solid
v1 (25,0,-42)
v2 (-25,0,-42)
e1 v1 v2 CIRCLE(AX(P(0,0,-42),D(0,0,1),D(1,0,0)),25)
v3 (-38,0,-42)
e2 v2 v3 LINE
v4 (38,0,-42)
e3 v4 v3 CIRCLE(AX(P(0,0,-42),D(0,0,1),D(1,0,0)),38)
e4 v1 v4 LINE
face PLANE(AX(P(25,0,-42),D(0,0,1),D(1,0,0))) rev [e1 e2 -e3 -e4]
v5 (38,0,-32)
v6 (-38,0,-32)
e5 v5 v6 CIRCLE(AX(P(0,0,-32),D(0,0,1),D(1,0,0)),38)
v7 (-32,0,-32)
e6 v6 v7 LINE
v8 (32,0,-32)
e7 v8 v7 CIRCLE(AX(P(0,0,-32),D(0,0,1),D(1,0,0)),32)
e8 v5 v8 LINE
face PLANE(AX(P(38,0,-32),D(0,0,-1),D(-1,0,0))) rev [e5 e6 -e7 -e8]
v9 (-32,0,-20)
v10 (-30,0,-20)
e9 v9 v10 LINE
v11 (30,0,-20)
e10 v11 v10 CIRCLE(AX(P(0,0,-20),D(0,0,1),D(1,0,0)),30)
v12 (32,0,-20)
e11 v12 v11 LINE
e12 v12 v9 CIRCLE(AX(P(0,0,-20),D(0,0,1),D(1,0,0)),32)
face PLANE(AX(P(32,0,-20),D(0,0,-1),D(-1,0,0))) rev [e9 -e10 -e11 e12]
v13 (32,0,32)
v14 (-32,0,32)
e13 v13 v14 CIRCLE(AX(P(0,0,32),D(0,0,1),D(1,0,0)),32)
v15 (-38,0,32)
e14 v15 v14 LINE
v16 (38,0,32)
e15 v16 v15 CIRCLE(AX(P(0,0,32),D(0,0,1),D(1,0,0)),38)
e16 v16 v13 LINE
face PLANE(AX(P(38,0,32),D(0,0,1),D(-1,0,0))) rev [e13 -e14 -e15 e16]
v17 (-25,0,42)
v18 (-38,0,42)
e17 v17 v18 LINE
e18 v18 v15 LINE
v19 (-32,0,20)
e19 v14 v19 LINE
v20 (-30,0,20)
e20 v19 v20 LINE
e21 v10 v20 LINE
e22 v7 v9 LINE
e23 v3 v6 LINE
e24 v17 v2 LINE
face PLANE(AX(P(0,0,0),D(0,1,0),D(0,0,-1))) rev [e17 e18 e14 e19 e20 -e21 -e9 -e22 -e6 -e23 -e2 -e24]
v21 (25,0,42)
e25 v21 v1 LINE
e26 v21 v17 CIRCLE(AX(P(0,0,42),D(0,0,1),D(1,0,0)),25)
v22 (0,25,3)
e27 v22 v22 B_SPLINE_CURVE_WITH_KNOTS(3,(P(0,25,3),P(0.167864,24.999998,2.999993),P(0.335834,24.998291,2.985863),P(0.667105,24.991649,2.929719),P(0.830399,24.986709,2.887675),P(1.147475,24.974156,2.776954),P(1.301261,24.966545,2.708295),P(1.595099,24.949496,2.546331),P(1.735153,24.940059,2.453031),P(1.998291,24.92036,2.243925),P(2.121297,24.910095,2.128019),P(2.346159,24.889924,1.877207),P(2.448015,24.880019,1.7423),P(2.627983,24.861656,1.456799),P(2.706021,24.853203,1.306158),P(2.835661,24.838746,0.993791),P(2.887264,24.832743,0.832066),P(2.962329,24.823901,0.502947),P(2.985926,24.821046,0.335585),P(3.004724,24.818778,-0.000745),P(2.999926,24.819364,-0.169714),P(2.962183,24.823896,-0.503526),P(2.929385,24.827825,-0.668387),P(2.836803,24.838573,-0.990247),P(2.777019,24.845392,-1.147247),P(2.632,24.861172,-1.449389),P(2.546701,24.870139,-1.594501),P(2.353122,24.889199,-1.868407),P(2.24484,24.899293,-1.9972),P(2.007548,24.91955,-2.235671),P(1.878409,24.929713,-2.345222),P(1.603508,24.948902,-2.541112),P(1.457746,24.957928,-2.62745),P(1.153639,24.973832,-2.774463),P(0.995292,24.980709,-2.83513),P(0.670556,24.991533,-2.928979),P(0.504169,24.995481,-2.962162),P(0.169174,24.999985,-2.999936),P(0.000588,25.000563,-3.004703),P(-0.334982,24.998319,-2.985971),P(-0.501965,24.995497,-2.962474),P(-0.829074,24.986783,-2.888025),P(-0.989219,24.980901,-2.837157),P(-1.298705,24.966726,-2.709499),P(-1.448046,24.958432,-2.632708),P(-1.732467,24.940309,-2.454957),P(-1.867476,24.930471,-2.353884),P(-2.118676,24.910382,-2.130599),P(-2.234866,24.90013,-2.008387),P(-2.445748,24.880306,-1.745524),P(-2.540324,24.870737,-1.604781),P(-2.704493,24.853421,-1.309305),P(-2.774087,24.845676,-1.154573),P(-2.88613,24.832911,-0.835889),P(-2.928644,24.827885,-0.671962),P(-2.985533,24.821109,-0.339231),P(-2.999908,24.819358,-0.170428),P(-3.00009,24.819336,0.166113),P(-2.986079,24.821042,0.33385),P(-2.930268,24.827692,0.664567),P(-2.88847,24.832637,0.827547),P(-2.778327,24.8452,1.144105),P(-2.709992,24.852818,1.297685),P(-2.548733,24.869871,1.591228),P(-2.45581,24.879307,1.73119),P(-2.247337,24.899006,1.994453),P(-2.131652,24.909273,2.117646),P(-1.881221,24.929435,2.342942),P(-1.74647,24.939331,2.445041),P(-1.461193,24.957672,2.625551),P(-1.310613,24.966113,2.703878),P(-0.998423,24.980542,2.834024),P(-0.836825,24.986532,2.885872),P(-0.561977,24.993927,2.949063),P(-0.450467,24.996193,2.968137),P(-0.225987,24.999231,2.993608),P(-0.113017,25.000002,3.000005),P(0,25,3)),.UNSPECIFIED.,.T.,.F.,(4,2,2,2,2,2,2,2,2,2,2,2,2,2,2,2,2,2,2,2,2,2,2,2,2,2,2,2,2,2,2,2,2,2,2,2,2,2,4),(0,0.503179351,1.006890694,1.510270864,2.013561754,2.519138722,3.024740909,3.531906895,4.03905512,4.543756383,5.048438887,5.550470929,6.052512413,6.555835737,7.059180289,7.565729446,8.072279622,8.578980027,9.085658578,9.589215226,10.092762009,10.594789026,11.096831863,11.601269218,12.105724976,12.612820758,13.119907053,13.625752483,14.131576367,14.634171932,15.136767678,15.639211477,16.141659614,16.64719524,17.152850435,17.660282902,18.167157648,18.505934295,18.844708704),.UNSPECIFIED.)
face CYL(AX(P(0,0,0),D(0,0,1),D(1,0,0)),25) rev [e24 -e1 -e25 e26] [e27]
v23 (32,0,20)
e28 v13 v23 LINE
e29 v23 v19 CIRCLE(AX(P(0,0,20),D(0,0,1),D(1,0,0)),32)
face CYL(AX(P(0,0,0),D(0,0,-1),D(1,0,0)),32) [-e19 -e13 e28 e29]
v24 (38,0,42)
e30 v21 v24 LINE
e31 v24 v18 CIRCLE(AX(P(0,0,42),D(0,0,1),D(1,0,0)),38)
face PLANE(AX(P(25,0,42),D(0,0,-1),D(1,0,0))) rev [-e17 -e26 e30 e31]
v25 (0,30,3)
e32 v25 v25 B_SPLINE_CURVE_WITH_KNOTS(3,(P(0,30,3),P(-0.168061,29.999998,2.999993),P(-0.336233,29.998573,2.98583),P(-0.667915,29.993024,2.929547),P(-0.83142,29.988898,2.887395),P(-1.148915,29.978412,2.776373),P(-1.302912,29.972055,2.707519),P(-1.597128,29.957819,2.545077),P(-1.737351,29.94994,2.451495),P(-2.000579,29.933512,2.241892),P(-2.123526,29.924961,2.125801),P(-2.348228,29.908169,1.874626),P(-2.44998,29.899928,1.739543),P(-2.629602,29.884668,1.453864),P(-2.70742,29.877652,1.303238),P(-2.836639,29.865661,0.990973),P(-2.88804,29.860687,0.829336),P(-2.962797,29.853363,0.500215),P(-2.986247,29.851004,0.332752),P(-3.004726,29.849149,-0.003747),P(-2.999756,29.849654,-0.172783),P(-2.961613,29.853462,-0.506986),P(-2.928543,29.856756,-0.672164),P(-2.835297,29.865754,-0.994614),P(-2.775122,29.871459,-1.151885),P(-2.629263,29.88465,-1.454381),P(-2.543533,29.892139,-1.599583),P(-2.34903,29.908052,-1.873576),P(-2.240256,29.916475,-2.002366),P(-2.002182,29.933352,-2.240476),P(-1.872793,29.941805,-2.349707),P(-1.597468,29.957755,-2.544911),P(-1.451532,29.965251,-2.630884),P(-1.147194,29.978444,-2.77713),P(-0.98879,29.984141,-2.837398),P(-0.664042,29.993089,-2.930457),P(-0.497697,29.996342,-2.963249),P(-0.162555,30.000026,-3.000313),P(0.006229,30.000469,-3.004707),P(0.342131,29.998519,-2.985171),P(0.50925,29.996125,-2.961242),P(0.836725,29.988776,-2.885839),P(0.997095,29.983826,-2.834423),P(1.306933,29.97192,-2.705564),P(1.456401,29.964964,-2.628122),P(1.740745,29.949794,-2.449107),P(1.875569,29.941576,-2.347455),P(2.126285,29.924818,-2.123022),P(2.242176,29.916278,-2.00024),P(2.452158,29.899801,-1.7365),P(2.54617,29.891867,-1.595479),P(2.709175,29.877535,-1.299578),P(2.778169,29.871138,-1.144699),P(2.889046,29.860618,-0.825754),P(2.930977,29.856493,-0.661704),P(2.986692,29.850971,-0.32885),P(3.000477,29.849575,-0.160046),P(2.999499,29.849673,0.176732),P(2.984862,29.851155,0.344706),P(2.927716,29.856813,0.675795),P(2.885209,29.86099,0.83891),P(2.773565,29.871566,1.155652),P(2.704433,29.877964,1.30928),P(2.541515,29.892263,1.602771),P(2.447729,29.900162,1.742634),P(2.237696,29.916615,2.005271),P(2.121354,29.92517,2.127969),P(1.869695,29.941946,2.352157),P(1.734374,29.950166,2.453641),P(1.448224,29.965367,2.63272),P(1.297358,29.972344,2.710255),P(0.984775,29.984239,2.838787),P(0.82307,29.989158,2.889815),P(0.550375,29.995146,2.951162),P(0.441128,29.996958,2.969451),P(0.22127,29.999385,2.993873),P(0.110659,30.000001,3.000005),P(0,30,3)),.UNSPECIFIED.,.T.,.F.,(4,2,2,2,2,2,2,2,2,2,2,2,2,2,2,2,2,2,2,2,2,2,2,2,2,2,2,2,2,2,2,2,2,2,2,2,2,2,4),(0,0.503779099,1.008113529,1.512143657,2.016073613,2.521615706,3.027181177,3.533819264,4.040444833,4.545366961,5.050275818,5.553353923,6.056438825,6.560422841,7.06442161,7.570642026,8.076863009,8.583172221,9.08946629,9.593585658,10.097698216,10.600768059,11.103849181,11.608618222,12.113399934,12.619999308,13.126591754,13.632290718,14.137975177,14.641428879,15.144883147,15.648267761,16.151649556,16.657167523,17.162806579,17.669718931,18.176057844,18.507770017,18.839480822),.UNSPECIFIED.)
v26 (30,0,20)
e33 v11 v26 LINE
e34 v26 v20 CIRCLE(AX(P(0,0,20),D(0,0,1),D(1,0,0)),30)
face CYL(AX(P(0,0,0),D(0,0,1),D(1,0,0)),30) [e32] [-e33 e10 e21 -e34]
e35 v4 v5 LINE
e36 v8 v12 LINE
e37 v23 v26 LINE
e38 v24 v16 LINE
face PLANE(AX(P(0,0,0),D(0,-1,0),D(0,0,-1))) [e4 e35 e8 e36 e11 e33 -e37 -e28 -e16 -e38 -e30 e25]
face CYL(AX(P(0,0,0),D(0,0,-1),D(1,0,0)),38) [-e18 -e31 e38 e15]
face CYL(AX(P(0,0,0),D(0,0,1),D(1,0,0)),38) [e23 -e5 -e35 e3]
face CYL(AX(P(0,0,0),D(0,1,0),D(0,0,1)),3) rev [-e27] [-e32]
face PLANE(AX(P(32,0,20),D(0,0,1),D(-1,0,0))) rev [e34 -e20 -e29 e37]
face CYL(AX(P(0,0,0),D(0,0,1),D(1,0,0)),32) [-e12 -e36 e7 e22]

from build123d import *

# Parameters (mm, degrees)
REVOLVE1_START     = -42
REVOLVE1_DEPTH     = 42
REVOLVE1_2_DEPTH   = 10
REVOLVE1_START_2   = -32
REVOLVE1_3_DEPTH   = 12
SKETCH3_R          = 3
CUT_EXTRUDE1_DEPTH = 65.093681436


# Read off the part's stored shape, not the designer's step: Revolve1
with BuildPart() as part:
    # Revolve1 outline → Revolve1 (new body)
    with BuildSketch(Plane.XY.offset(REVOLVE1_START)):
        with BuildLine():
            ThreePointArc((-25, 0), (0, 25), (25, 0))
            Line((25, 0), (30, 0))
            ThreePointArc((30, 0), (0, 30), (-30, 0))
            Line((-30, 0), (-25, 0))
        make_face()
    revolve1 = extrude(amount=REVOLVE1_DEPTH)



with BuildPart() as body_2:
    # Revolve1 2 outline → Revolve1 2 (new body)
    with BuildSketch(Plane.XY.offset(REVOLVE1_START)):
        with BuildLine():
            ThreePointArc((-30, 0), (0, 30), (30, 0))
            Line((30, 0), (38, 0))
            ThreePointArc((38, 0), (0, 38), (-38, 0))
            Line((-38, 0), (-30, 0))
        make_face()
    revolve1_2 = extrude(amount=REVOLVE1_2_DEPTH)


with BuildPart() as part_1:
    add(part.part)

    add(body_2.part)  # Revolve1 3 merges body 2
    # Revolve1 3 outline → Revolve1 3 (add)
    with BuildSketch(Plane.XY.offset(REVOLVE1_START_2)):
        with BuildLine():
            ThreePointArc((-30, 0), (0, 30), (30, 0))
            Line((30, 0), (32, 0))
            ThreePointArc((32, 0), (0, 32), (-32, 0))
            Line((-32, 0), (-30, 0))
        make_face()
    revolve1_3 = extrude(amount=REVOLVE1_3_DEPTH)

    # Mirror1: Revolve1, Revolve1 2, Revolve1 3 across plane
    add(revolve1.mirror(Plane(origin=(30, 0, 0), x_dir=(1, 0, 0), z_dir=(0, 0, -1))))
    add(revolve1_2.mirror(Plane(origin=(30, 0, 0), x_dir=(1, 0, 0), z_dir=(0, 0, -1))))
    add(revolve1_3.mirror(Plane(origin=(30, 0, 0), x_dir=(1, 0, 0), z_dir=(0, 0, -1))))

    # Sketch3 → Cut-Extrude1 (cut, through all)
    with BuildSketch(Plane(origin=(0, 30, 0), x_dir=(1, 0, 0), z_dir=(0, 1, 0))):
        with Locations(Location((0, 0, 0), (0, 0, 270))):
            Circle(SKETCH3_R)
    extrude(amount=-CUT_EXTRUDE1_DEPTH, mode=Mode.SUBTRACT)


solid = part_1.part
